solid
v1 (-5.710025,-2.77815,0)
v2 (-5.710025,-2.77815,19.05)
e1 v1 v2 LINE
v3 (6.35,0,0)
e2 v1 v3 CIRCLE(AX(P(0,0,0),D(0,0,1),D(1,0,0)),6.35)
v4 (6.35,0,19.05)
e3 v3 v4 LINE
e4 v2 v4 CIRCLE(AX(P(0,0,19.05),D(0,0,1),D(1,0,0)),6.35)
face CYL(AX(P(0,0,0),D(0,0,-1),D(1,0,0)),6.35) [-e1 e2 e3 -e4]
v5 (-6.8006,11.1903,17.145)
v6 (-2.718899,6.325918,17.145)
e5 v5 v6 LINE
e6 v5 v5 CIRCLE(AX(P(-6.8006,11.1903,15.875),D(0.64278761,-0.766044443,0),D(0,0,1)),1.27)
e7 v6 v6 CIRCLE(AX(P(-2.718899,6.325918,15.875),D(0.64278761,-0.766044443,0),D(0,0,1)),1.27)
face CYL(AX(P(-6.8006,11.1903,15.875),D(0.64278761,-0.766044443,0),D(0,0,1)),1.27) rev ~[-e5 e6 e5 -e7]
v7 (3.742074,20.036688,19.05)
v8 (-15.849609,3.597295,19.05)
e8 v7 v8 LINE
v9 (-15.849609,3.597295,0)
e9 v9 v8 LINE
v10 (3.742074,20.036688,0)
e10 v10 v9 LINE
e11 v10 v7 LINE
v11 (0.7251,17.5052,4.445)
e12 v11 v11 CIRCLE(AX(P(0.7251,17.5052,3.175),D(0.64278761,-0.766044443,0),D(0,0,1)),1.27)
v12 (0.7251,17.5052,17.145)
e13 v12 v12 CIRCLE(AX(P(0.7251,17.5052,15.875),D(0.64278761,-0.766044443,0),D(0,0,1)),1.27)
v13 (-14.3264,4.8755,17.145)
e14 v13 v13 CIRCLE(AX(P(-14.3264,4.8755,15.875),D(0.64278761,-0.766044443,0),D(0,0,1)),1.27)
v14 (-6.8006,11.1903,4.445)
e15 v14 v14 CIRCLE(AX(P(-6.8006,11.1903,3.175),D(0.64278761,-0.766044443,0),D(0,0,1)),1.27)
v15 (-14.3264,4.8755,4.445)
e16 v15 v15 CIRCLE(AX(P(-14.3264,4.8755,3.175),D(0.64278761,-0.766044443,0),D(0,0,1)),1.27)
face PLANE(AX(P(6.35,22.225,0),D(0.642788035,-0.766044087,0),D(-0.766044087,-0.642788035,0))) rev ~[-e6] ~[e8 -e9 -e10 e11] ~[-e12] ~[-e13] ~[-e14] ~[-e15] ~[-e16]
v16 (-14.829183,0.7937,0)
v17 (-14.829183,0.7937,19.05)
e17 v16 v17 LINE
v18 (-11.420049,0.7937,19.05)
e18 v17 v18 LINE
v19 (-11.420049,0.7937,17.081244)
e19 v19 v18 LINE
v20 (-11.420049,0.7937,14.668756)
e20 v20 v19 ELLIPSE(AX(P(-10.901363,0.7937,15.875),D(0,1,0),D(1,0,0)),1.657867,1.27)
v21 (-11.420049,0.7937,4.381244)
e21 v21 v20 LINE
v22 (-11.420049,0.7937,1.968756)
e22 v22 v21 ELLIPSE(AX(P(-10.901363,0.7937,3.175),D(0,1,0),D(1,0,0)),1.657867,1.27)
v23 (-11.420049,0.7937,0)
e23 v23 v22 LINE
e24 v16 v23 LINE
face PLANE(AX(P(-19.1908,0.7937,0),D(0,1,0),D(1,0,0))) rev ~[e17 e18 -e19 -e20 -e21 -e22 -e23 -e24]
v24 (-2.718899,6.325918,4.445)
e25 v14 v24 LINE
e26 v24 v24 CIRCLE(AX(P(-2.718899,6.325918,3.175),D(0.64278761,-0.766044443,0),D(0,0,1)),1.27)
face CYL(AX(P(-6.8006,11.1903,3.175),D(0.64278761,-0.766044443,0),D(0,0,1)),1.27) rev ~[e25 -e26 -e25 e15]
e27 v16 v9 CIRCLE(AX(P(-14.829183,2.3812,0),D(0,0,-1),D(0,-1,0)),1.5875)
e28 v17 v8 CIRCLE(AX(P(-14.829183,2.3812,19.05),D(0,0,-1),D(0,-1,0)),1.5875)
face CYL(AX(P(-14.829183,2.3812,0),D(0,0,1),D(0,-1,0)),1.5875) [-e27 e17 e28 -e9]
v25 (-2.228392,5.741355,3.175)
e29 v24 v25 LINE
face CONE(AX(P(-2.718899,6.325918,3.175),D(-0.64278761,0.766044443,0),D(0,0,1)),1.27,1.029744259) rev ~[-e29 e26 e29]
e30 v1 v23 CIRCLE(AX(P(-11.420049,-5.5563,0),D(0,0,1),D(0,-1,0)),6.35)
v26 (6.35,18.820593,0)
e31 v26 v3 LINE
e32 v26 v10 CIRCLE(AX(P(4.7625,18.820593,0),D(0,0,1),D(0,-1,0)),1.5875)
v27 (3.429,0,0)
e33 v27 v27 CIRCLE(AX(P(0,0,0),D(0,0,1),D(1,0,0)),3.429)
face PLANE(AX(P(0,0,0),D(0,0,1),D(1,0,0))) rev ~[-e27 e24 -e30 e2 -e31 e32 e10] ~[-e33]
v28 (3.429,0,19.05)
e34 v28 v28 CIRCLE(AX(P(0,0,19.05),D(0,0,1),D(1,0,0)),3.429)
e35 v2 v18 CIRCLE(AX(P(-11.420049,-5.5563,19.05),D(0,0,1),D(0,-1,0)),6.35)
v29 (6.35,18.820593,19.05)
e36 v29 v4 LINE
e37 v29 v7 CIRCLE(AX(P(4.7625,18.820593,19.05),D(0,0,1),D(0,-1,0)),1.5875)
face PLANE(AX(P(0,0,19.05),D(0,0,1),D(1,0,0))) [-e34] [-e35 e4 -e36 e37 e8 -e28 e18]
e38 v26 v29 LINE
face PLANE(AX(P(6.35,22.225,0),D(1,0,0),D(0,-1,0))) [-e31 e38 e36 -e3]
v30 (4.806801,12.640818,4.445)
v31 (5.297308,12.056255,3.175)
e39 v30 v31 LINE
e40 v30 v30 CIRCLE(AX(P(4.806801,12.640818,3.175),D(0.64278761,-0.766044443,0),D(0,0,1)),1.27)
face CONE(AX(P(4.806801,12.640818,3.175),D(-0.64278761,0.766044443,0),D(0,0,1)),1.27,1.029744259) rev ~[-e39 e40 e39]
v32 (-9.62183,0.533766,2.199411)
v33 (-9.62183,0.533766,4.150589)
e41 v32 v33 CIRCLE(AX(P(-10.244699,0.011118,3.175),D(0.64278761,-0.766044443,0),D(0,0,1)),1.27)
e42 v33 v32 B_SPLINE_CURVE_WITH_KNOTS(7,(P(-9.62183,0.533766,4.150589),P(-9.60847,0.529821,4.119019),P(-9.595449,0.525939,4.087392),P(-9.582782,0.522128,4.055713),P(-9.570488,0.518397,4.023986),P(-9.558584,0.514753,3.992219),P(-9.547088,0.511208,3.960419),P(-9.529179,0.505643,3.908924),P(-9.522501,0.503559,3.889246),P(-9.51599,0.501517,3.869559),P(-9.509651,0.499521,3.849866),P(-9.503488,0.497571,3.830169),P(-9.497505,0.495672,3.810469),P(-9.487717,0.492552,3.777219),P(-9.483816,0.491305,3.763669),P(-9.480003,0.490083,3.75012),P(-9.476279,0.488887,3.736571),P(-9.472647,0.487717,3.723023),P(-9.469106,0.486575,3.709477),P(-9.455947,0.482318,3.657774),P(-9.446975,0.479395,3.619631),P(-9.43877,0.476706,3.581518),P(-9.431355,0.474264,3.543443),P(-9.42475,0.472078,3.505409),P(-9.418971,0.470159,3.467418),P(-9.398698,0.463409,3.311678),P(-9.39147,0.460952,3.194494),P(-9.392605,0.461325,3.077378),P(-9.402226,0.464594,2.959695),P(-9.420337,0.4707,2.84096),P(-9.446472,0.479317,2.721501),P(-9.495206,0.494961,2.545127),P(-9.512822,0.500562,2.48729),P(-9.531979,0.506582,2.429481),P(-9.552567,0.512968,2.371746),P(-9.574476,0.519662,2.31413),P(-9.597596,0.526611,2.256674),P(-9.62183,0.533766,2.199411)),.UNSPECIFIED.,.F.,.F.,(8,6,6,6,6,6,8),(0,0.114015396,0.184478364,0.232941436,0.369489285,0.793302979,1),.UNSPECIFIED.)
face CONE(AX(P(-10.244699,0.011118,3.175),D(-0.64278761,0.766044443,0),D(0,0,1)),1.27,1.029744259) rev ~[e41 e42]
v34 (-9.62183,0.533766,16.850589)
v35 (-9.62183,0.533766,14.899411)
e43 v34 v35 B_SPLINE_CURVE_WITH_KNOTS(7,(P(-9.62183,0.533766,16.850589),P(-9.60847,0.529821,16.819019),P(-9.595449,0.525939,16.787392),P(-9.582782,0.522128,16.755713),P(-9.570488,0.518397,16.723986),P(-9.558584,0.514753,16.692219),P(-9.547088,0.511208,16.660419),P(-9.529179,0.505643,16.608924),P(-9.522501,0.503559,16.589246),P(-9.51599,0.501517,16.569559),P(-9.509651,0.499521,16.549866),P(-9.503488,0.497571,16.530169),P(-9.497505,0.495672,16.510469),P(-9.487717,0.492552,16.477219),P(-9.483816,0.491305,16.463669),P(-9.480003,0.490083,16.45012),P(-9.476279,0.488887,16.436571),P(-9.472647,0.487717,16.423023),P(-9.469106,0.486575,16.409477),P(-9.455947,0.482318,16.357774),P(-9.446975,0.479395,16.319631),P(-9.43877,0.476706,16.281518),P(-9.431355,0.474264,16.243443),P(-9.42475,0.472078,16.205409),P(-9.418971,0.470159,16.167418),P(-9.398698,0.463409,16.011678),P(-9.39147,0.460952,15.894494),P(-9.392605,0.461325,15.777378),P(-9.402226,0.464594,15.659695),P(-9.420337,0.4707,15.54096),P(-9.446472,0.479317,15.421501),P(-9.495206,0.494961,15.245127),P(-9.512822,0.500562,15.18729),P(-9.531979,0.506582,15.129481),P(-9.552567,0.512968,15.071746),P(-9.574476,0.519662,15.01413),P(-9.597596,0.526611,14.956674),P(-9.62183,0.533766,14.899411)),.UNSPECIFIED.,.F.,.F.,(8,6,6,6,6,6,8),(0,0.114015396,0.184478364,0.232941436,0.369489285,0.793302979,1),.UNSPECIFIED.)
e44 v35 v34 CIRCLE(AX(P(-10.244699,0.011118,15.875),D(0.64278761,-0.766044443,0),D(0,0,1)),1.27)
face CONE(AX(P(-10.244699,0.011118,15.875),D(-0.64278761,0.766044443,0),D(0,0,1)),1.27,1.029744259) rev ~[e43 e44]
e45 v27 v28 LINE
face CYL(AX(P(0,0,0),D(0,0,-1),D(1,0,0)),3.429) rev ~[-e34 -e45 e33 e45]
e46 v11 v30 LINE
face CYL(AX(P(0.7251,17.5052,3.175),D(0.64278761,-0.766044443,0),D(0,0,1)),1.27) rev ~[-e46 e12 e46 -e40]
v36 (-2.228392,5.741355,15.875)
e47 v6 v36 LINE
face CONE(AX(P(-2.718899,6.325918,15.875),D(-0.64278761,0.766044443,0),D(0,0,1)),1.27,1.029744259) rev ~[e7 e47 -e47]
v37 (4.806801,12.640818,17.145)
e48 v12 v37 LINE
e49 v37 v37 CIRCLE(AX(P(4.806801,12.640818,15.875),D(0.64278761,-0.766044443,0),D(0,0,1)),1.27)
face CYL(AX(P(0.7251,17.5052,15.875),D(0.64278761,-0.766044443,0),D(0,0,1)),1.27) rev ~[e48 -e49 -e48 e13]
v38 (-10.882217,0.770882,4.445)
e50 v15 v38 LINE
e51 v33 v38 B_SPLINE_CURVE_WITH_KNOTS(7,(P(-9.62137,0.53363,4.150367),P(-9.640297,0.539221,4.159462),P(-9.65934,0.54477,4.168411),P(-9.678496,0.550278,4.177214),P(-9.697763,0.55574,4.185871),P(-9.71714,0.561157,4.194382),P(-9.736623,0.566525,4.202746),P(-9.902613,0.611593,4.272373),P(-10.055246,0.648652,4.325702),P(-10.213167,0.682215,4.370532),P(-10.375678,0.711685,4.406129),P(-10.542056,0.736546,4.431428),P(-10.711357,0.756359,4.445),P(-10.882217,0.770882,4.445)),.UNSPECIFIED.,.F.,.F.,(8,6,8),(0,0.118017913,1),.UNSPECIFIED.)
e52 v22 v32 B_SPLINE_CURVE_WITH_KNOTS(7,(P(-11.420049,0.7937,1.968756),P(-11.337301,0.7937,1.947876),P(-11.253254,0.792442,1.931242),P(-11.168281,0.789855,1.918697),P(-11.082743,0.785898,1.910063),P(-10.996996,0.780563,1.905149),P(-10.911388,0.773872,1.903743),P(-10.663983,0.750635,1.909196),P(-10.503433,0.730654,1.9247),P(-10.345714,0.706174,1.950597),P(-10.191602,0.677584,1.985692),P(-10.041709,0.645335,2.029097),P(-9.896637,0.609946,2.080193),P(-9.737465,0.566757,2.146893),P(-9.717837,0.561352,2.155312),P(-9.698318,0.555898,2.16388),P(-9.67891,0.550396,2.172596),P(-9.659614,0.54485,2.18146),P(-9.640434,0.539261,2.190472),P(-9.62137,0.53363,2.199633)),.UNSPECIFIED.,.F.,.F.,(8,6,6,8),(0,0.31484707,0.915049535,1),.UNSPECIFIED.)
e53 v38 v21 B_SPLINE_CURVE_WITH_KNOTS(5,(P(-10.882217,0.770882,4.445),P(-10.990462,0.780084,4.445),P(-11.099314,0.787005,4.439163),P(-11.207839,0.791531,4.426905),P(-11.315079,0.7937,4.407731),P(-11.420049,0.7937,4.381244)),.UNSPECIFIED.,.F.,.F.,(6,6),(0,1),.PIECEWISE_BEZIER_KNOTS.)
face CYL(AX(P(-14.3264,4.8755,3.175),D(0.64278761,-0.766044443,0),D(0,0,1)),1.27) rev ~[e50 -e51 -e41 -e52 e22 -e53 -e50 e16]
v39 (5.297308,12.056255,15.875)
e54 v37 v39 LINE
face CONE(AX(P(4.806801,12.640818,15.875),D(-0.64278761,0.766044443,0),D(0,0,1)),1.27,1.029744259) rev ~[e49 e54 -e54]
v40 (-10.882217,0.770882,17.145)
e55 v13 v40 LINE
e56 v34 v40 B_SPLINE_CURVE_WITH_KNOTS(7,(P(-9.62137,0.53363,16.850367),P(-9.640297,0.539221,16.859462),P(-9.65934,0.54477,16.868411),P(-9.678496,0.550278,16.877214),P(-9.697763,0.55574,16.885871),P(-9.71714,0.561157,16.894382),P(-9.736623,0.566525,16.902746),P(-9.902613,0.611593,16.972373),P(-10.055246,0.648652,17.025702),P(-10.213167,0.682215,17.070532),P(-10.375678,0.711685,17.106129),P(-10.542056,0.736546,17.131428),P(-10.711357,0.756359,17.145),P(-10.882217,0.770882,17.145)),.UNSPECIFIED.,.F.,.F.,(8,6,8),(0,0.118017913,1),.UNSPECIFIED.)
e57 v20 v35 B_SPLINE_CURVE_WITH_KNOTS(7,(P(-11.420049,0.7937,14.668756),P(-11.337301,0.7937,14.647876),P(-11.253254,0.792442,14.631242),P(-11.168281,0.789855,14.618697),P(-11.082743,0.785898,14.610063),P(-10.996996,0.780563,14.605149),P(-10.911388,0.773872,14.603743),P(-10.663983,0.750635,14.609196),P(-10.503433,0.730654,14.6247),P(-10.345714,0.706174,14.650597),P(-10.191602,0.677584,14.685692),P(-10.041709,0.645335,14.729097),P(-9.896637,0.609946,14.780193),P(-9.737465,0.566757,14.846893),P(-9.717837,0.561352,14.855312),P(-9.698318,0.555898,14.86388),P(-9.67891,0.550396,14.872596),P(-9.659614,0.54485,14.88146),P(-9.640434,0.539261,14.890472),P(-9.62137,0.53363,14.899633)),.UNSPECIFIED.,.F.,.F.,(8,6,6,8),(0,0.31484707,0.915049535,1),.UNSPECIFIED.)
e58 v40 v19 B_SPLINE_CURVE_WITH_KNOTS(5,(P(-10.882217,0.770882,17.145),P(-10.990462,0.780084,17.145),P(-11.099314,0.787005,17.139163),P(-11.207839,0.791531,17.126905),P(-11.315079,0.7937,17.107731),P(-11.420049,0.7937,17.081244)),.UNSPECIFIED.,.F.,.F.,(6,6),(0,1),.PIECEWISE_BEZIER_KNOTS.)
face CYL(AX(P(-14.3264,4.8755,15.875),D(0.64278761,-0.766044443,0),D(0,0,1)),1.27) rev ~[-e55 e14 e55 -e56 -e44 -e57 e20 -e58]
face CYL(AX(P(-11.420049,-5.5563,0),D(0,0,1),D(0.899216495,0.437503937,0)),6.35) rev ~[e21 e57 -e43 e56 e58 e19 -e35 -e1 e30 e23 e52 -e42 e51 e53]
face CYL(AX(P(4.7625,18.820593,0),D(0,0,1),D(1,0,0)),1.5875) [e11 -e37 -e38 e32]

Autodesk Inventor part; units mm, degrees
ref_plane "YZ Plane" through (0, 0, 0) normal (1, 0, 0) x (0, 1, 0)
ref_plane "XZ Plane" through (0, 0, 0) normal (0, 1, 0) x (-1, 0, 0)
ref_plane "XY Plane" through (0, 0, 0) normal (0, 0, 1) x (1, 0, 0)
sketch "Sketch3" plane through (0, 0, 0) normal (0, 0, 1) x (1, 0, 0)
  circle A0 centre (0, 0) radius 3.429
  circle A1 centre (0, 0) radius 6.35
  line L0 (6.35, 22.225) -> (-19.1908, 0.7937)
  line L1 (-19.1908, 0.7937) -> (-6.3002, 0.7937)
  line L2 (6.35, 22.225) -> (6.35, 0)
  dimension "d23" = 6.858
  dimension "d24" = 12.7
  dimension "d27" = 0.7937
  dimension "d28" = 6.35
  dimension "d29" = 50
  dimension "d30" = 22.225
extrude "Extrusion3" add sketch "Sketch3" along normal blind 19.05
fillet "Fillet2" radius 6.35 1 edges at (-6.3002, 0.7938, 9.525)
sketch "Sketch4" plane through (-19.1908, 0.7938, 19.05) normal (-0.6427876, 0.7660444, 0) x (0.7660444, 0.6427876, 0)
  line L0 (33.3411, 0) -> (0, 0) projected
  line L1 (6.35, 0) -> (6.35, 18.8766) construction
  line L2 (0, 19.05) -> (0, 0) projected
  line L3 (0, 9.525) -> (33.3411, 9.525) construction
  line L4 (33.3411, 19.05) -> (33.3411, 0) projected
  point P0 (14.1908, 19.05)
  point P1 (6.35, 3.175)
  point P2 (6.35, 15.875)
  point P3 (16.1742, 15.875)
  point P4 (16.1742, 3.175)
  point P5 (25.9983, 15.875)
  point P6 (25.9983, 3.175)
  dimension "d33" = 6.35
  dimension "d34" = 3.175
  dimension "d45" = 9.8242
hole "Hole1" at (-14.3264, 4.8755, 15.875) at (-14.3264, 4.8755, 3.175) at (-6.8006, 11.1903, 15.875) at (-6.8006, 11.1903, 3.175) at (0.7251, 17.5052, 3.175) at (0.7251, 17.5052, 15.875) direction (0.6427876, -0.7660444, 0) diameter 2.54 depth 6.35 tip angle 118
fillet "Fillet4" radius 1.5875 2 edges at (-19.1908, 0.7937, 9.525) (6.35, 22.225, 9.525)
properties part number "Wedge Mount" material "UHMW, White"
